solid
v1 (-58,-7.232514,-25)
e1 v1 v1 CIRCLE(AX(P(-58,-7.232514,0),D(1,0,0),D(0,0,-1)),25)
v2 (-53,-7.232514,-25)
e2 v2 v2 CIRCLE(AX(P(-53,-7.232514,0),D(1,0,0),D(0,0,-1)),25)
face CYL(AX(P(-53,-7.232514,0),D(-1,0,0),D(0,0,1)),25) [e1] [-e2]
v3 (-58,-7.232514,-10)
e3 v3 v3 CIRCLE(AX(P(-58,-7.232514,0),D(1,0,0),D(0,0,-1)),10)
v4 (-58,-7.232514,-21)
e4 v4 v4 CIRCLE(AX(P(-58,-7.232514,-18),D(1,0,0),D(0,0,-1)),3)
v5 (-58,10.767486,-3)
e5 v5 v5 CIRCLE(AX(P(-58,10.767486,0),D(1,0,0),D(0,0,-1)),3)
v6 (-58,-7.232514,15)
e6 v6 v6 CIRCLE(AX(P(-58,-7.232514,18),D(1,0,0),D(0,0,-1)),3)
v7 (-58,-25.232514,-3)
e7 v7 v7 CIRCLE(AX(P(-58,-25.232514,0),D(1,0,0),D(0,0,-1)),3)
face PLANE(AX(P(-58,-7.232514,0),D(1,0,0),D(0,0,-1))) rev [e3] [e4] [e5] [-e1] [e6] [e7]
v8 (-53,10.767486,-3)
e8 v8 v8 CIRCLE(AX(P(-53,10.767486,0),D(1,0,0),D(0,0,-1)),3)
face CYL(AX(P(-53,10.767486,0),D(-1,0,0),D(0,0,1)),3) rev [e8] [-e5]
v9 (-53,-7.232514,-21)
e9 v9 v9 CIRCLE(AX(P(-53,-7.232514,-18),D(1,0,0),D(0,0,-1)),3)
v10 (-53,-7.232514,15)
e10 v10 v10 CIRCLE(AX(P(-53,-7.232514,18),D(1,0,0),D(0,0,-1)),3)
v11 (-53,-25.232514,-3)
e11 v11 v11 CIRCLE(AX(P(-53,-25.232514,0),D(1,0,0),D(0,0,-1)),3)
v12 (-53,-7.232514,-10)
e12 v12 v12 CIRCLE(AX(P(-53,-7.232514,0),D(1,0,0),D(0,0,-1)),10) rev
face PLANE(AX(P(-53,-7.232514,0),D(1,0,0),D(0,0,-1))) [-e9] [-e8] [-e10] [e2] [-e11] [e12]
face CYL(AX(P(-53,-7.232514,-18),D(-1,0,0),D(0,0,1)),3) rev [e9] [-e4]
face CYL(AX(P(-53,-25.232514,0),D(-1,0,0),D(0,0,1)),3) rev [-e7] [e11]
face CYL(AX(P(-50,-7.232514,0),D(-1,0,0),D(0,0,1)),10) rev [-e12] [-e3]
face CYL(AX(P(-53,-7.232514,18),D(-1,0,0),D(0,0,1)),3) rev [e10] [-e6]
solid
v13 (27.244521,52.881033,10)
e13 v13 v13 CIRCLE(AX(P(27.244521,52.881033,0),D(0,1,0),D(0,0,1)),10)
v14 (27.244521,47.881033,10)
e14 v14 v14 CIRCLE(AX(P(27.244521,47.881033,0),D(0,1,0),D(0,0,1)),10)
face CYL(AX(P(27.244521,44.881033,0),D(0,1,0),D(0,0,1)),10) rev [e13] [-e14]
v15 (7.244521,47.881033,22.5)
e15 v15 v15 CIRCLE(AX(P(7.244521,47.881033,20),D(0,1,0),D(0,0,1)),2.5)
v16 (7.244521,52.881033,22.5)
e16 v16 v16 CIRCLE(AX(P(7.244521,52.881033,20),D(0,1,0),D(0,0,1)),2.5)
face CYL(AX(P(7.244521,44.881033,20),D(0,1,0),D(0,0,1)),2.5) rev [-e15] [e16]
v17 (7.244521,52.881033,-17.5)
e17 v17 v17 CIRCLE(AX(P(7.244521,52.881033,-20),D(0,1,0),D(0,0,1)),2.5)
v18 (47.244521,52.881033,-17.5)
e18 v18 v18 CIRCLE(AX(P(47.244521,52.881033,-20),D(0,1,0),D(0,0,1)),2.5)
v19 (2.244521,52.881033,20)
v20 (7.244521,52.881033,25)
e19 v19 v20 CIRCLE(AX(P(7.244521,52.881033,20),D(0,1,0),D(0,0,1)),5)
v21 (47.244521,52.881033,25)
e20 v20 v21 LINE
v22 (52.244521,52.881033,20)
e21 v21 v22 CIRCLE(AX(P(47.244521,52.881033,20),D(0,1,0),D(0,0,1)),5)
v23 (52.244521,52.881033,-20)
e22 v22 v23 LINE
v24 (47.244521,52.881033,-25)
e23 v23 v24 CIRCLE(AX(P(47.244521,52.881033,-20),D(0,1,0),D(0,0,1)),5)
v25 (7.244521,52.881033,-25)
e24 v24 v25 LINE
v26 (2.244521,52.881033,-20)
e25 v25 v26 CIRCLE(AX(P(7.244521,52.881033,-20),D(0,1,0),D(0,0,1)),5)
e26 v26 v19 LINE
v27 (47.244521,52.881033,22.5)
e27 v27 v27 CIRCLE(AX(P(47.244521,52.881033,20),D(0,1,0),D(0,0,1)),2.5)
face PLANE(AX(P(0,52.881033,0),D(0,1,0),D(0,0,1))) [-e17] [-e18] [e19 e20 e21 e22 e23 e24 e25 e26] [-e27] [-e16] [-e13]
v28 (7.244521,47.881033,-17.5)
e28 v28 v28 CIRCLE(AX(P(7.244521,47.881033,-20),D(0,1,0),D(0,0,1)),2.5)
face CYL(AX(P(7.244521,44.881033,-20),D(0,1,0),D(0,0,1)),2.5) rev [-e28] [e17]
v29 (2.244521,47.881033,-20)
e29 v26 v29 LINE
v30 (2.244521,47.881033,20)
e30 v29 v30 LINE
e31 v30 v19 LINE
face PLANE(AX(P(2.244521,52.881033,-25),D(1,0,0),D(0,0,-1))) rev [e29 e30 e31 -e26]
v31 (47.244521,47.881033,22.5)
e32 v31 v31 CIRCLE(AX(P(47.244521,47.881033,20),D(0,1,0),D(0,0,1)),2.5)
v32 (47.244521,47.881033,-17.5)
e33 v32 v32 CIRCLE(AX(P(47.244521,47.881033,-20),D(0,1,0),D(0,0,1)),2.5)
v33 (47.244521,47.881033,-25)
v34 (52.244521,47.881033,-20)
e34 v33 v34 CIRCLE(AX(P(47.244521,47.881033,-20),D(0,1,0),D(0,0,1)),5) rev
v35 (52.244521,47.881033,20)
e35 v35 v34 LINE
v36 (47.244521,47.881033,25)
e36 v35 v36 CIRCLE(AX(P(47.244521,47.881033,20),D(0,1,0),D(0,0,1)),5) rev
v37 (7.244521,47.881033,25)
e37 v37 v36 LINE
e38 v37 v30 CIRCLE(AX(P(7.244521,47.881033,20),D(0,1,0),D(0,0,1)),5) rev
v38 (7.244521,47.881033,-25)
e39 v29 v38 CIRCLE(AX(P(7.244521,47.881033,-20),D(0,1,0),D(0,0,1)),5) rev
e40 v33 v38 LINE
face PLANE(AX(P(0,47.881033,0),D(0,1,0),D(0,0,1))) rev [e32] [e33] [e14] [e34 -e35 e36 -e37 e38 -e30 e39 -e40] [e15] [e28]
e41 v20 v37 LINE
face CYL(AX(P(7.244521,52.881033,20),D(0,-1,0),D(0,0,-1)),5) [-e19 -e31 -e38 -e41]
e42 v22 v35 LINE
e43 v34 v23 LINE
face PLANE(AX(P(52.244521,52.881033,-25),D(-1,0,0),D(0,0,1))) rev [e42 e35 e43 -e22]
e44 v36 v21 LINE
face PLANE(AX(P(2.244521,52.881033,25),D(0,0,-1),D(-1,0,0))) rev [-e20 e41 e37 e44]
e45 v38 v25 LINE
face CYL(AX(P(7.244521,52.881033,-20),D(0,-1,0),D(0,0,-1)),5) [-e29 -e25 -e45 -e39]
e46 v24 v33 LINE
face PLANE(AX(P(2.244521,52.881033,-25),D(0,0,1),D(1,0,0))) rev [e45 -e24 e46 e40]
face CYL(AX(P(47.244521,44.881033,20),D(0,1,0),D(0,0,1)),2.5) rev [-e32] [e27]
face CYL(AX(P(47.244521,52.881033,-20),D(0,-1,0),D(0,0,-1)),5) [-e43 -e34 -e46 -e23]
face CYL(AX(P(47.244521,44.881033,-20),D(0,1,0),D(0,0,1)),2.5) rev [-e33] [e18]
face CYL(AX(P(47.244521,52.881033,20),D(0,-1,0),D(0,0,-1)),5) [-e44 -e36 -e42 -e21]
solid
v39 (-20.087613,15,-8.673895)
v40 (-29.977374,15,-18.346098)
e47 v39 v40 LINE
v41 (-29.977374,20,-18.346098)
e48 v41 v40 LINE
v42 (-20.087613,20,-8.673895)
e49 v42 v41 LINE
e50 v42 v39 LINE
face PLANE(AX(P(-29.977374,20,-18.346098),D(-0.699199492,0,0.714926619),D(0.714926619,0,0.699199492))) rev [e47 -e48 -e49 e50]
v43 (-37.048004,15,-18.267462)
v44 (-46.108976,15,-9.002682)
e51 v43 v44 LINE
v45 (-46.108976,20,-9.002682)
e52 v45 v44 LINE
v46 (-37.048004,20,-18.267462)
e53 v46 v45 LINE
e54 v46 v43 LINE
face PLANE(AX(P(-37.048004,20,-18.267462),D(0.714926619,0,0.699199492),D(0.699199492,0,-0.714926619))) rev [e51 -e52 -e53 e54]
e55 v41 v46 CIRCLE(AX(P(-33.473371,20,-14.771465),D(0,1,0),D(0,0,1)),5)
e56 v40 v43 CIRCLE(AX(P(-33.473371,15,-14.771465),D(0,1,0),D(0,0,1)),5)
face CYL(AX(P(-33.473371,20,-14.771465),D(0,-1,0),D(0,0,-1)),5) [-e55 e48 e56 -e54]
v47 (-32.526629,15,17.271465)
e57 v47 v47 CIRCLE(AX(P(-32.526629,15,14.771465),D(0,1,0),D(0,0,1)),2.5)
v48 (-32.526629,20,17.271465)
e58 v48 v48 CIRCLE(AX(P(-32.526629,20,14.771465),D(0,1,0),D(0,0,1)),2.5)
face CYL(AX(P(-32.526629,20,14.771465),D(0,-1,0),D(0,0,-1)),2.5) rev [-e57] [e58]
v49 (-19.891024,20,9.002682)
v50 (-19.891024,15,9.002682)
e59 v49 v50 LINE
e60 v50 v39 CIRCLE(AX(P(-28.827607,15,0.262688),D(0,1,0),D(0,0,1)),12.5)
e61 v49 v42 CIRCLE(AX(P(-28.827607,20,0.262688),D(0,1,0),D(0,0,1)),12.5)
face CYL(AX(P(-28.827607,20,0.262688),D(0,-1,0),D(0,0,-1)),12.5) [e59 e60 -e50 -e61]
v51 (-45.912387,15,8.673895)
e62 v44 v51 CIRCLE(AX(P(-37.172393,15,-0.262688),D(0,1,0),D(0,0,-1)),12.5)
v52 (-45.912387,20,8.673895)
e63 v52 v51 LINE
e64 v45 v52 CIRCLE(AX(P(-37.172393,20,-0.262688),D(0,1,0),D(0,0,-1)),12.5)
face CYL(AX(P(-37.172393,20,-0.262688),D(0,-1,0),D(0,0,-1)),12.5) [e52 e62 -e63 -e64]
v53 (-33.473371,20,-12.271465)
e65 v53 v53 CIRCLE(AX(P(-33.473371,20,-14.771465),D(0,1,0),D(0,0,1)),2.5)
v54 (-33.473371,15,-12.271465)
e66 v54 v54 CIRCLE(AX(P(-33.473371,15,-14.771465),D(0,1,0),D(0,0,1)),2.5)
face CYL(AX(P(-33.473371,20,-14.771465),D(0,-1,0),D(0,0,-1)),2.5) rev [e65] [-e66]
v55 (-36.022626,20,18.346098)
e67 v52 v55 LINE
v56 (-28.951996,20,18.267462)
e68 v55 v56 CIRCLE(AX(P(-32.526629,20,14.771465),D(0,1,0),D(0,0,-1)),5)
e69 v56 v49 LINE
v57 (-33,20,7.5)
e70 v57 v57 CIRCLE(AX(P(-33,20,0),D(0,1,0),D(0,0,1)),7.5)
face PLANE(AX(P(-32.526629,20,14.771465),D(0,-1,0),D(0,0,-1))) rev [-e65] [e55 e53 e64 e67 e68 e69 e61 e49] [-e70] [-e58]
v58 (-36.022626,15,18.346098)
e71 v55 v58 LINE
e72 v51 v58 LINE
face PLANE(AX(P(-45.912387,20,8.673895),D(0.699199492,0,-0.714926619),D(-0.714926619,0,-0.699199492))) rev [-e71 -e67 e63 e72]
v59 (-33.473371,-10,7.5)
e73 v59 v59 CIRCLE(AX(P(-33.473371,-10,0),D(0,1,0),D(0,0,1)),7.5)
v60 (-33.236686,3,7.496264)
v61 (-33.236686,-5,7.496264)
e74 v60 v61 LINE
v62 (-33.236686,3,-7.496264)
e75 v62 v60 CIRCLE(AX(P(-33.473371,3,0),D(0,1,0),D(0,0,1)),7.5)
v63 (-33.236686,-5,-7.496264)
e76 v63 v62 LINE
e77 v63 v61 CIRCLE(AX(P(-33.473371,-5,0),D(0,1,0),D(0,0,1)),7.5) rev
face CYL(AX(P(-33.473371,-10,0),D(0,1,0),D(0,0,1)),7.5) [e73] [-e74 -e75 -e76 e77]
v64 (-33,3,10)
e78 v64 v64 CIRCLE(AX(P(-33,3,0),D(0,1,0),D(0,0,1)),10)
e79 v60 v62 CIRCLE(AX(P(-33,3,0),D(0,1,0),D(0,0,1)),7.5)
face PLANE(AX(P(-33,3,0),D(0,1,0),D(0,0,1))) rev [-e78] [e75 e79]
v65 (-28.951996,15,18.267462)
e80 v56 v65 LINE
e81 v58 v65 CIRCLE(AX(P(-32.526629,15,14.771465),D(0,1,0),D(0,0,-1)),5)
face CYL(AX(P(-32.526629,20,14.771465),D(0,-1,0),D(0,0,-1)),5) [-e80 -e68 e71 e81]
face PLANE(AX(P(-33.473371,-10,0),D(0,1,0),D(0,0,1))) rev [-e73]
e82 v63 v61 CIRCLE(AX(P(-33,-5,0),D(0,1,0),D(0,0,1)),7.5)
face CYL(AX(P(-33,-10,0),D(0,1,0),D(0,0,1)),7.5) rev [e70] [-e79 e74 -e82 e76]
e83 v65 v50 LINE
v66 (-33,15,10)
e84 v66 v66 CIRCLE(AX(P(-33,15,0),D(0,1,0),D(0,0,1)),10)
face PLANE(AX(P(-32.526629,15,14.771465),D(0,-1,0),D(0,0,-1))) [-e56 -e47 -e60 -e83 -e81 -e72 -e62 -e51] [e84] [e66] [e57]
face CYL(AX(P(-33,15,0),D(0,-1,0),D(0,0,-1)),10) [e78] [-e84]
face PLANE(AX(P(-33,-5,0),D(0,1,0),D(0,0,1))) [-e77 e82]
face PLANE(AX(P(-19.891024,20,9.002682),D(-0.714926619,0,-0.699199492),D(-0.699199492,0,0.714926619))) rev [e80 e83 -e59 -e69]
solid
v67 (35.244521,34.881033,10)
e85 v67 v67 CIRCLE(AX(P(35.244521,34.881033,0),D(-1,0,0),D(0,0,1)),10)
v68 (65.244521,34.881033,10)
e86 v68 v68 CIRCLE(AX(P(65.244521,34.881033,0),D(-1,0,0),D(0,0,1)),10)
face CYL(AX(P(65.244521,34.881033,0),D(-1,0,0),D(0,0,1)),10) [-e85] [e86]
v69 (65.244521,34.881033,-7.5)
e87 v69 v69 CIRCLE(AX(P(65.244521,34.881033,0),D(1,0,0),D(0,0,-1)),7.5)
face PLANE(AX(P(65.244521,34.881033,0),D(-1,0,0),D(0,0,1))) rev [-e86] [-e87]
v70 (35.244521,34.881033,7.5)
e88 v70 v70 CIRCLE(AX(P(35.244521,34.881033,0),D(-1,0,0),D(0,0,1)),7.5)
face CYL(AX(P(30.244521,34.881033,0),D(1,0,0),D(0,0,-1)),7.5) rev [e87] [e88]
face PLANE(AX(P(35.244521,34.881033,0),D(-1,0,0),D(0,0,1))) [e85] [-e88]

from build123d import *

# Parameters (mm, degrees)
EXTRUDE_1_OUTLINE_W = 50
EXTRUDE_1_OUTLINE_H = 50
EXTRUDE_1_DEPTH     = 5
SKETCH_15_R         = 10
CUT_EXTRUDE_1_DEPTH = 8
FILLET_1_R          = 5
SKETCH_16_R         = 2.5
CUT_EXTRUDE_2_DEPTH = 8
SKETCH_17_R         = 25
SKETCH_17_R_2       = 3
EXTRUDE_2_DEPTH     = 5
SKETCH_18_R         = 10
CUT_EXTRUDE_3_DEPTH = 8
EXTRUDE_START       = -2
SKETCH_19_R         = 10
EXTRUDE_3_DEPTH     = 12
EXTRUDE_START_2     = 2
SKETCH_20_R         = 10
EXTRUDE_4_DEPTH     = 30
SKETCH_21_R         = 7.5
CUT_EXTRUDE_4_DEPTH = 35
SKETCH_22_R         = 7.5
CUT_EXTRUDE_5_DEPTH = 25
SKETCH_23_R         = 2.5
EXTRUDE_5_DEPTH     = 5
SKETCH_24_R         = 7.5
EXTRUDE_6_DEPTH     = 30
SKETCH_27_R         = 7.5
CUT_EXTRUDE_6_DEPTH = 25


# Read off the part's stored shape, not the designer's step: 보스-돌출1
with BuildPart() as part:
    # 보스-돌출1 outline → 보스-돌출1 (new body)
    with BuildSketch(Plane(origin=(0, 47.88103287, 0), x_dir=(1, 0, 0), z_dir=(0, 1, 0))):
        with Locations((27.244520639, 0)):
            Rectangle(EXTRUDE_1_OUTLINE_W, EXTRUDE_1_OUTLINE_H)
    extrude(amount=EXTRUDE_1_DEPTH)

    # 스케치15 → 컷-돌출1 (cut)
    with BuildSketch(Plane(origin=(0, 52.88103287, 0), x_dir=(1, 0, 0), z_dir=(0, 1, 0))):
        with Locations(Location((27.244520639, 0, 0), (0, 0, 270))):
            Circle(SKETCH_15_R)
    extrude(amount=-CUT_EXTRUDE_1_DEPTH, mode=Mode.SUBTRACT)

    # 필렛1
    fillet_1_edges = [part.edges().sort_by_distance(p)[0] for p in [
        (52.244520639, 50.38103287, 25),
        (2.244520639, 50.38103287, 25),
        (2.244520639, 50.38103287, -25),
        (52.244520639, 50.38103287, -25),
    ]]
    fillet(fillet_1_edges, radius=FILLET_1_R)

    # 스케치16 → 컷-돌출2 (cut)
    with BuildSketch(Plane(origin=(0, 52.88103287, 0), x_dir=(1, 0, 0), z_dir=(0, 1, 0))):
        with Locations(Location((7.244520639, 20, 0), (0, 0, 270))):
            Circle(SKETCH_16_R)
        with Locations(Location((7.244520639, -20, 0), (0, 0, 270))):
            Circle(SKETCH_16_R)
        with Locations(Location((47.244520639, -20, 0), (0, 0, 270))):
            Circle(SKETCH_16_R)
        with Locations(Location((47.244520639, 20, 0), (0, 0, 270))):
            Circle(SKETCH_16_R)
    extrude(amount=-CUT_EXTRUDE_2_DEPTH, mode=Mode.SUBTRACT)


with BuildPart() as body_2:
    # 스케치17 → 보스-돌출2 (new body)
    with BuildSketch(Plane(origin=(-58, 0, 0), x_dir=(0, 0, -1), z_dir=(1, 0, 0))):
        with Locations((0, -7.232514397)):
            Circle(SKETCH_17_R)
        with Locations((0, 10.767485603)):
            Circle(SKETCH_17_R_2, mode=Mode.SUBTRACT)
        with Locations((-18, -7.232514397)):
            Circle(SKETCH_17_R_2, mode=Mode.SUBTRACT)
        with Locations((18, -7.232514397)):
            Circle(SKETCH_17_R_2, mode=Mode.SUBTRACT)
        with Locations((0, -25.232514397)):
            Circle(SKETCH_17_R_2, mode=Mode.SUBTRACT)
    extrude(amount=EXTRUDE_2_DEPTH)

    # 스케치18 → 컷-돌출3 (cut)
    with BuildSketch(Plane(origin=(-58, 0, 0), x_dir=(0, 0, -1), z_dir=(1, 0, 0))):
        with Locations((0, -7.232514397)):
            Circle(SKETCH_18_R)
    extrude(amount=CUT_EXTRUDE_3_DEPTH, mode=Mode.SUBTRACT)


with BuildPart() as body_3:
    # 스케치19 → 보스-돌출3 (new body)
    with BuildSketch(Plane(origin=(0, 5, 0), x_dir=(1, 0, 0), z_dir=(0, 1, 0)).offset(EXTRUDE_START)):
        with Locations(Location((-33, 0, 0), (0, 0, 270))):
            Circle(SKETCH_19_R)
    extrude(amount=EXTRUDE_3_DEPTH)

    # 스케치22 → 컷-돌출5 (cut)
    with BuildSketch(Plane(origin=(0, 15, 0), x_dir=(1, 0, 0), z_dir=(0, 1, 0))):
        with Locations(Location((-33, 0, 0), (0, 0, 270))):
            Circle(SKETCH_22_R)
    extrude(amount=-CUT_EXTRUDE_5_DEPTH, mode=Mode.SUBTRACT)

    # 스케치23 → 보스-돌출5 (add)
    with BuildSketch(Plane(origin=(0, 15, 0), x_dir=(1, 0, 0), z_dir=(0, 1, 0))):
        with BuildLine():
            Line((-29.977373614, 18.346097633), (-20.087613409, 8.67389473))
            ThreePointArc((-20.087613409, 8.67389473), (-16.328380033, -0.123678532), (-19.891024332, -9.002681656))
            Line((-19.891024332, -9.002681656), (-28.951995832, -18.267462002))
            ThreePointArc((-28.951995832, -18.267462002), (-32.471025137, -19.771155352), (-36.022626386, -18.346097633))
            Line((-36.022626386, -18.346097633), (-45.912386591, -8.67389473))
            ThreePointArc((-45.912386591, -8.67389473), (-49.671619967, 0.123678532), (-46.108975668, 9.002681656))
            Line((-46.108975668, 9.002681656), (-37.048004168, 18.267462002))
            ThreePointArc((-37.048004168, 18.267462002), (-33.528974863, 19.771155352), (-29.977373614, 18.346097633))
        make_face()
        with Locations(Location((-33.473371076, 14.77146454, 0), (0, 0, 270))):
            Circle(SKETCH_23_R, mode=Mode.SUBTRACT)
        with Locations(Location((-32.526628924, -14.77146454, 0), (0, 0, 270))):
            Circle(SKETCH_23_R, mode=Mode.SUBTRACT)
    extrude(amount=EXTRUDE_5_DEPTH)

    # 스케치24 → 보스-돌출6 (add)
    with BuildSketch(Plane(origin=(0, 20, 0), x_dir=(1, 0, 0), z_dir=(0, 1, 0))):
        with Locations(Location((-33.473371076, 0, 0), (0, 0, 270))):
            Circle(SKETCH_24_R)
    extrude(amount=-EXTRUDE_6_DEPTH)

    # 스케치27 → 컷-돌출6 (cut)
    with BuildSketch(Plane(origin=(0, 20, 0), x_dir=(1, 0, 0), z_dir=(0, 1, 0))):
        with Locations(Location((-33, 0, 0), (0, 0, 270))):
            Circle(SKETCH_27_R)
    extrude(amount=-CUT_EXTRUDE_6_DEPTH, mode=Mode.SUBTRACT)


with BuildPart() as body_4:
    # 스케치20 → 보스-돌출4 (new body)
    with BuildSketch(Plane.ZY.offset(-37.244520639).offset(EXTRUDE_START_2)):
        with Locations((0, 34.88103287)):
            Circle(SKETCH_20_R)
    extrude(amount=-EXTRUDE_4_DEPTH)

    # 스케치21 → 컷-돌출4 (cut)
    with BuildSketch(Plane(origin=(65.244520639, 0, 0), x_dir=(0, 0, -1), z_dir=(1, 0, 0))):
        with Locations((0, 34.88103287)):
            Circle(SKETCH_21_R)
    extrude(amount=-CUT_EXTRUDE_4_DEPTH, mode=Mode.SUBTRACT)


solid = Compound([part.part, body_2.part, body_3.part, body_4.part])
